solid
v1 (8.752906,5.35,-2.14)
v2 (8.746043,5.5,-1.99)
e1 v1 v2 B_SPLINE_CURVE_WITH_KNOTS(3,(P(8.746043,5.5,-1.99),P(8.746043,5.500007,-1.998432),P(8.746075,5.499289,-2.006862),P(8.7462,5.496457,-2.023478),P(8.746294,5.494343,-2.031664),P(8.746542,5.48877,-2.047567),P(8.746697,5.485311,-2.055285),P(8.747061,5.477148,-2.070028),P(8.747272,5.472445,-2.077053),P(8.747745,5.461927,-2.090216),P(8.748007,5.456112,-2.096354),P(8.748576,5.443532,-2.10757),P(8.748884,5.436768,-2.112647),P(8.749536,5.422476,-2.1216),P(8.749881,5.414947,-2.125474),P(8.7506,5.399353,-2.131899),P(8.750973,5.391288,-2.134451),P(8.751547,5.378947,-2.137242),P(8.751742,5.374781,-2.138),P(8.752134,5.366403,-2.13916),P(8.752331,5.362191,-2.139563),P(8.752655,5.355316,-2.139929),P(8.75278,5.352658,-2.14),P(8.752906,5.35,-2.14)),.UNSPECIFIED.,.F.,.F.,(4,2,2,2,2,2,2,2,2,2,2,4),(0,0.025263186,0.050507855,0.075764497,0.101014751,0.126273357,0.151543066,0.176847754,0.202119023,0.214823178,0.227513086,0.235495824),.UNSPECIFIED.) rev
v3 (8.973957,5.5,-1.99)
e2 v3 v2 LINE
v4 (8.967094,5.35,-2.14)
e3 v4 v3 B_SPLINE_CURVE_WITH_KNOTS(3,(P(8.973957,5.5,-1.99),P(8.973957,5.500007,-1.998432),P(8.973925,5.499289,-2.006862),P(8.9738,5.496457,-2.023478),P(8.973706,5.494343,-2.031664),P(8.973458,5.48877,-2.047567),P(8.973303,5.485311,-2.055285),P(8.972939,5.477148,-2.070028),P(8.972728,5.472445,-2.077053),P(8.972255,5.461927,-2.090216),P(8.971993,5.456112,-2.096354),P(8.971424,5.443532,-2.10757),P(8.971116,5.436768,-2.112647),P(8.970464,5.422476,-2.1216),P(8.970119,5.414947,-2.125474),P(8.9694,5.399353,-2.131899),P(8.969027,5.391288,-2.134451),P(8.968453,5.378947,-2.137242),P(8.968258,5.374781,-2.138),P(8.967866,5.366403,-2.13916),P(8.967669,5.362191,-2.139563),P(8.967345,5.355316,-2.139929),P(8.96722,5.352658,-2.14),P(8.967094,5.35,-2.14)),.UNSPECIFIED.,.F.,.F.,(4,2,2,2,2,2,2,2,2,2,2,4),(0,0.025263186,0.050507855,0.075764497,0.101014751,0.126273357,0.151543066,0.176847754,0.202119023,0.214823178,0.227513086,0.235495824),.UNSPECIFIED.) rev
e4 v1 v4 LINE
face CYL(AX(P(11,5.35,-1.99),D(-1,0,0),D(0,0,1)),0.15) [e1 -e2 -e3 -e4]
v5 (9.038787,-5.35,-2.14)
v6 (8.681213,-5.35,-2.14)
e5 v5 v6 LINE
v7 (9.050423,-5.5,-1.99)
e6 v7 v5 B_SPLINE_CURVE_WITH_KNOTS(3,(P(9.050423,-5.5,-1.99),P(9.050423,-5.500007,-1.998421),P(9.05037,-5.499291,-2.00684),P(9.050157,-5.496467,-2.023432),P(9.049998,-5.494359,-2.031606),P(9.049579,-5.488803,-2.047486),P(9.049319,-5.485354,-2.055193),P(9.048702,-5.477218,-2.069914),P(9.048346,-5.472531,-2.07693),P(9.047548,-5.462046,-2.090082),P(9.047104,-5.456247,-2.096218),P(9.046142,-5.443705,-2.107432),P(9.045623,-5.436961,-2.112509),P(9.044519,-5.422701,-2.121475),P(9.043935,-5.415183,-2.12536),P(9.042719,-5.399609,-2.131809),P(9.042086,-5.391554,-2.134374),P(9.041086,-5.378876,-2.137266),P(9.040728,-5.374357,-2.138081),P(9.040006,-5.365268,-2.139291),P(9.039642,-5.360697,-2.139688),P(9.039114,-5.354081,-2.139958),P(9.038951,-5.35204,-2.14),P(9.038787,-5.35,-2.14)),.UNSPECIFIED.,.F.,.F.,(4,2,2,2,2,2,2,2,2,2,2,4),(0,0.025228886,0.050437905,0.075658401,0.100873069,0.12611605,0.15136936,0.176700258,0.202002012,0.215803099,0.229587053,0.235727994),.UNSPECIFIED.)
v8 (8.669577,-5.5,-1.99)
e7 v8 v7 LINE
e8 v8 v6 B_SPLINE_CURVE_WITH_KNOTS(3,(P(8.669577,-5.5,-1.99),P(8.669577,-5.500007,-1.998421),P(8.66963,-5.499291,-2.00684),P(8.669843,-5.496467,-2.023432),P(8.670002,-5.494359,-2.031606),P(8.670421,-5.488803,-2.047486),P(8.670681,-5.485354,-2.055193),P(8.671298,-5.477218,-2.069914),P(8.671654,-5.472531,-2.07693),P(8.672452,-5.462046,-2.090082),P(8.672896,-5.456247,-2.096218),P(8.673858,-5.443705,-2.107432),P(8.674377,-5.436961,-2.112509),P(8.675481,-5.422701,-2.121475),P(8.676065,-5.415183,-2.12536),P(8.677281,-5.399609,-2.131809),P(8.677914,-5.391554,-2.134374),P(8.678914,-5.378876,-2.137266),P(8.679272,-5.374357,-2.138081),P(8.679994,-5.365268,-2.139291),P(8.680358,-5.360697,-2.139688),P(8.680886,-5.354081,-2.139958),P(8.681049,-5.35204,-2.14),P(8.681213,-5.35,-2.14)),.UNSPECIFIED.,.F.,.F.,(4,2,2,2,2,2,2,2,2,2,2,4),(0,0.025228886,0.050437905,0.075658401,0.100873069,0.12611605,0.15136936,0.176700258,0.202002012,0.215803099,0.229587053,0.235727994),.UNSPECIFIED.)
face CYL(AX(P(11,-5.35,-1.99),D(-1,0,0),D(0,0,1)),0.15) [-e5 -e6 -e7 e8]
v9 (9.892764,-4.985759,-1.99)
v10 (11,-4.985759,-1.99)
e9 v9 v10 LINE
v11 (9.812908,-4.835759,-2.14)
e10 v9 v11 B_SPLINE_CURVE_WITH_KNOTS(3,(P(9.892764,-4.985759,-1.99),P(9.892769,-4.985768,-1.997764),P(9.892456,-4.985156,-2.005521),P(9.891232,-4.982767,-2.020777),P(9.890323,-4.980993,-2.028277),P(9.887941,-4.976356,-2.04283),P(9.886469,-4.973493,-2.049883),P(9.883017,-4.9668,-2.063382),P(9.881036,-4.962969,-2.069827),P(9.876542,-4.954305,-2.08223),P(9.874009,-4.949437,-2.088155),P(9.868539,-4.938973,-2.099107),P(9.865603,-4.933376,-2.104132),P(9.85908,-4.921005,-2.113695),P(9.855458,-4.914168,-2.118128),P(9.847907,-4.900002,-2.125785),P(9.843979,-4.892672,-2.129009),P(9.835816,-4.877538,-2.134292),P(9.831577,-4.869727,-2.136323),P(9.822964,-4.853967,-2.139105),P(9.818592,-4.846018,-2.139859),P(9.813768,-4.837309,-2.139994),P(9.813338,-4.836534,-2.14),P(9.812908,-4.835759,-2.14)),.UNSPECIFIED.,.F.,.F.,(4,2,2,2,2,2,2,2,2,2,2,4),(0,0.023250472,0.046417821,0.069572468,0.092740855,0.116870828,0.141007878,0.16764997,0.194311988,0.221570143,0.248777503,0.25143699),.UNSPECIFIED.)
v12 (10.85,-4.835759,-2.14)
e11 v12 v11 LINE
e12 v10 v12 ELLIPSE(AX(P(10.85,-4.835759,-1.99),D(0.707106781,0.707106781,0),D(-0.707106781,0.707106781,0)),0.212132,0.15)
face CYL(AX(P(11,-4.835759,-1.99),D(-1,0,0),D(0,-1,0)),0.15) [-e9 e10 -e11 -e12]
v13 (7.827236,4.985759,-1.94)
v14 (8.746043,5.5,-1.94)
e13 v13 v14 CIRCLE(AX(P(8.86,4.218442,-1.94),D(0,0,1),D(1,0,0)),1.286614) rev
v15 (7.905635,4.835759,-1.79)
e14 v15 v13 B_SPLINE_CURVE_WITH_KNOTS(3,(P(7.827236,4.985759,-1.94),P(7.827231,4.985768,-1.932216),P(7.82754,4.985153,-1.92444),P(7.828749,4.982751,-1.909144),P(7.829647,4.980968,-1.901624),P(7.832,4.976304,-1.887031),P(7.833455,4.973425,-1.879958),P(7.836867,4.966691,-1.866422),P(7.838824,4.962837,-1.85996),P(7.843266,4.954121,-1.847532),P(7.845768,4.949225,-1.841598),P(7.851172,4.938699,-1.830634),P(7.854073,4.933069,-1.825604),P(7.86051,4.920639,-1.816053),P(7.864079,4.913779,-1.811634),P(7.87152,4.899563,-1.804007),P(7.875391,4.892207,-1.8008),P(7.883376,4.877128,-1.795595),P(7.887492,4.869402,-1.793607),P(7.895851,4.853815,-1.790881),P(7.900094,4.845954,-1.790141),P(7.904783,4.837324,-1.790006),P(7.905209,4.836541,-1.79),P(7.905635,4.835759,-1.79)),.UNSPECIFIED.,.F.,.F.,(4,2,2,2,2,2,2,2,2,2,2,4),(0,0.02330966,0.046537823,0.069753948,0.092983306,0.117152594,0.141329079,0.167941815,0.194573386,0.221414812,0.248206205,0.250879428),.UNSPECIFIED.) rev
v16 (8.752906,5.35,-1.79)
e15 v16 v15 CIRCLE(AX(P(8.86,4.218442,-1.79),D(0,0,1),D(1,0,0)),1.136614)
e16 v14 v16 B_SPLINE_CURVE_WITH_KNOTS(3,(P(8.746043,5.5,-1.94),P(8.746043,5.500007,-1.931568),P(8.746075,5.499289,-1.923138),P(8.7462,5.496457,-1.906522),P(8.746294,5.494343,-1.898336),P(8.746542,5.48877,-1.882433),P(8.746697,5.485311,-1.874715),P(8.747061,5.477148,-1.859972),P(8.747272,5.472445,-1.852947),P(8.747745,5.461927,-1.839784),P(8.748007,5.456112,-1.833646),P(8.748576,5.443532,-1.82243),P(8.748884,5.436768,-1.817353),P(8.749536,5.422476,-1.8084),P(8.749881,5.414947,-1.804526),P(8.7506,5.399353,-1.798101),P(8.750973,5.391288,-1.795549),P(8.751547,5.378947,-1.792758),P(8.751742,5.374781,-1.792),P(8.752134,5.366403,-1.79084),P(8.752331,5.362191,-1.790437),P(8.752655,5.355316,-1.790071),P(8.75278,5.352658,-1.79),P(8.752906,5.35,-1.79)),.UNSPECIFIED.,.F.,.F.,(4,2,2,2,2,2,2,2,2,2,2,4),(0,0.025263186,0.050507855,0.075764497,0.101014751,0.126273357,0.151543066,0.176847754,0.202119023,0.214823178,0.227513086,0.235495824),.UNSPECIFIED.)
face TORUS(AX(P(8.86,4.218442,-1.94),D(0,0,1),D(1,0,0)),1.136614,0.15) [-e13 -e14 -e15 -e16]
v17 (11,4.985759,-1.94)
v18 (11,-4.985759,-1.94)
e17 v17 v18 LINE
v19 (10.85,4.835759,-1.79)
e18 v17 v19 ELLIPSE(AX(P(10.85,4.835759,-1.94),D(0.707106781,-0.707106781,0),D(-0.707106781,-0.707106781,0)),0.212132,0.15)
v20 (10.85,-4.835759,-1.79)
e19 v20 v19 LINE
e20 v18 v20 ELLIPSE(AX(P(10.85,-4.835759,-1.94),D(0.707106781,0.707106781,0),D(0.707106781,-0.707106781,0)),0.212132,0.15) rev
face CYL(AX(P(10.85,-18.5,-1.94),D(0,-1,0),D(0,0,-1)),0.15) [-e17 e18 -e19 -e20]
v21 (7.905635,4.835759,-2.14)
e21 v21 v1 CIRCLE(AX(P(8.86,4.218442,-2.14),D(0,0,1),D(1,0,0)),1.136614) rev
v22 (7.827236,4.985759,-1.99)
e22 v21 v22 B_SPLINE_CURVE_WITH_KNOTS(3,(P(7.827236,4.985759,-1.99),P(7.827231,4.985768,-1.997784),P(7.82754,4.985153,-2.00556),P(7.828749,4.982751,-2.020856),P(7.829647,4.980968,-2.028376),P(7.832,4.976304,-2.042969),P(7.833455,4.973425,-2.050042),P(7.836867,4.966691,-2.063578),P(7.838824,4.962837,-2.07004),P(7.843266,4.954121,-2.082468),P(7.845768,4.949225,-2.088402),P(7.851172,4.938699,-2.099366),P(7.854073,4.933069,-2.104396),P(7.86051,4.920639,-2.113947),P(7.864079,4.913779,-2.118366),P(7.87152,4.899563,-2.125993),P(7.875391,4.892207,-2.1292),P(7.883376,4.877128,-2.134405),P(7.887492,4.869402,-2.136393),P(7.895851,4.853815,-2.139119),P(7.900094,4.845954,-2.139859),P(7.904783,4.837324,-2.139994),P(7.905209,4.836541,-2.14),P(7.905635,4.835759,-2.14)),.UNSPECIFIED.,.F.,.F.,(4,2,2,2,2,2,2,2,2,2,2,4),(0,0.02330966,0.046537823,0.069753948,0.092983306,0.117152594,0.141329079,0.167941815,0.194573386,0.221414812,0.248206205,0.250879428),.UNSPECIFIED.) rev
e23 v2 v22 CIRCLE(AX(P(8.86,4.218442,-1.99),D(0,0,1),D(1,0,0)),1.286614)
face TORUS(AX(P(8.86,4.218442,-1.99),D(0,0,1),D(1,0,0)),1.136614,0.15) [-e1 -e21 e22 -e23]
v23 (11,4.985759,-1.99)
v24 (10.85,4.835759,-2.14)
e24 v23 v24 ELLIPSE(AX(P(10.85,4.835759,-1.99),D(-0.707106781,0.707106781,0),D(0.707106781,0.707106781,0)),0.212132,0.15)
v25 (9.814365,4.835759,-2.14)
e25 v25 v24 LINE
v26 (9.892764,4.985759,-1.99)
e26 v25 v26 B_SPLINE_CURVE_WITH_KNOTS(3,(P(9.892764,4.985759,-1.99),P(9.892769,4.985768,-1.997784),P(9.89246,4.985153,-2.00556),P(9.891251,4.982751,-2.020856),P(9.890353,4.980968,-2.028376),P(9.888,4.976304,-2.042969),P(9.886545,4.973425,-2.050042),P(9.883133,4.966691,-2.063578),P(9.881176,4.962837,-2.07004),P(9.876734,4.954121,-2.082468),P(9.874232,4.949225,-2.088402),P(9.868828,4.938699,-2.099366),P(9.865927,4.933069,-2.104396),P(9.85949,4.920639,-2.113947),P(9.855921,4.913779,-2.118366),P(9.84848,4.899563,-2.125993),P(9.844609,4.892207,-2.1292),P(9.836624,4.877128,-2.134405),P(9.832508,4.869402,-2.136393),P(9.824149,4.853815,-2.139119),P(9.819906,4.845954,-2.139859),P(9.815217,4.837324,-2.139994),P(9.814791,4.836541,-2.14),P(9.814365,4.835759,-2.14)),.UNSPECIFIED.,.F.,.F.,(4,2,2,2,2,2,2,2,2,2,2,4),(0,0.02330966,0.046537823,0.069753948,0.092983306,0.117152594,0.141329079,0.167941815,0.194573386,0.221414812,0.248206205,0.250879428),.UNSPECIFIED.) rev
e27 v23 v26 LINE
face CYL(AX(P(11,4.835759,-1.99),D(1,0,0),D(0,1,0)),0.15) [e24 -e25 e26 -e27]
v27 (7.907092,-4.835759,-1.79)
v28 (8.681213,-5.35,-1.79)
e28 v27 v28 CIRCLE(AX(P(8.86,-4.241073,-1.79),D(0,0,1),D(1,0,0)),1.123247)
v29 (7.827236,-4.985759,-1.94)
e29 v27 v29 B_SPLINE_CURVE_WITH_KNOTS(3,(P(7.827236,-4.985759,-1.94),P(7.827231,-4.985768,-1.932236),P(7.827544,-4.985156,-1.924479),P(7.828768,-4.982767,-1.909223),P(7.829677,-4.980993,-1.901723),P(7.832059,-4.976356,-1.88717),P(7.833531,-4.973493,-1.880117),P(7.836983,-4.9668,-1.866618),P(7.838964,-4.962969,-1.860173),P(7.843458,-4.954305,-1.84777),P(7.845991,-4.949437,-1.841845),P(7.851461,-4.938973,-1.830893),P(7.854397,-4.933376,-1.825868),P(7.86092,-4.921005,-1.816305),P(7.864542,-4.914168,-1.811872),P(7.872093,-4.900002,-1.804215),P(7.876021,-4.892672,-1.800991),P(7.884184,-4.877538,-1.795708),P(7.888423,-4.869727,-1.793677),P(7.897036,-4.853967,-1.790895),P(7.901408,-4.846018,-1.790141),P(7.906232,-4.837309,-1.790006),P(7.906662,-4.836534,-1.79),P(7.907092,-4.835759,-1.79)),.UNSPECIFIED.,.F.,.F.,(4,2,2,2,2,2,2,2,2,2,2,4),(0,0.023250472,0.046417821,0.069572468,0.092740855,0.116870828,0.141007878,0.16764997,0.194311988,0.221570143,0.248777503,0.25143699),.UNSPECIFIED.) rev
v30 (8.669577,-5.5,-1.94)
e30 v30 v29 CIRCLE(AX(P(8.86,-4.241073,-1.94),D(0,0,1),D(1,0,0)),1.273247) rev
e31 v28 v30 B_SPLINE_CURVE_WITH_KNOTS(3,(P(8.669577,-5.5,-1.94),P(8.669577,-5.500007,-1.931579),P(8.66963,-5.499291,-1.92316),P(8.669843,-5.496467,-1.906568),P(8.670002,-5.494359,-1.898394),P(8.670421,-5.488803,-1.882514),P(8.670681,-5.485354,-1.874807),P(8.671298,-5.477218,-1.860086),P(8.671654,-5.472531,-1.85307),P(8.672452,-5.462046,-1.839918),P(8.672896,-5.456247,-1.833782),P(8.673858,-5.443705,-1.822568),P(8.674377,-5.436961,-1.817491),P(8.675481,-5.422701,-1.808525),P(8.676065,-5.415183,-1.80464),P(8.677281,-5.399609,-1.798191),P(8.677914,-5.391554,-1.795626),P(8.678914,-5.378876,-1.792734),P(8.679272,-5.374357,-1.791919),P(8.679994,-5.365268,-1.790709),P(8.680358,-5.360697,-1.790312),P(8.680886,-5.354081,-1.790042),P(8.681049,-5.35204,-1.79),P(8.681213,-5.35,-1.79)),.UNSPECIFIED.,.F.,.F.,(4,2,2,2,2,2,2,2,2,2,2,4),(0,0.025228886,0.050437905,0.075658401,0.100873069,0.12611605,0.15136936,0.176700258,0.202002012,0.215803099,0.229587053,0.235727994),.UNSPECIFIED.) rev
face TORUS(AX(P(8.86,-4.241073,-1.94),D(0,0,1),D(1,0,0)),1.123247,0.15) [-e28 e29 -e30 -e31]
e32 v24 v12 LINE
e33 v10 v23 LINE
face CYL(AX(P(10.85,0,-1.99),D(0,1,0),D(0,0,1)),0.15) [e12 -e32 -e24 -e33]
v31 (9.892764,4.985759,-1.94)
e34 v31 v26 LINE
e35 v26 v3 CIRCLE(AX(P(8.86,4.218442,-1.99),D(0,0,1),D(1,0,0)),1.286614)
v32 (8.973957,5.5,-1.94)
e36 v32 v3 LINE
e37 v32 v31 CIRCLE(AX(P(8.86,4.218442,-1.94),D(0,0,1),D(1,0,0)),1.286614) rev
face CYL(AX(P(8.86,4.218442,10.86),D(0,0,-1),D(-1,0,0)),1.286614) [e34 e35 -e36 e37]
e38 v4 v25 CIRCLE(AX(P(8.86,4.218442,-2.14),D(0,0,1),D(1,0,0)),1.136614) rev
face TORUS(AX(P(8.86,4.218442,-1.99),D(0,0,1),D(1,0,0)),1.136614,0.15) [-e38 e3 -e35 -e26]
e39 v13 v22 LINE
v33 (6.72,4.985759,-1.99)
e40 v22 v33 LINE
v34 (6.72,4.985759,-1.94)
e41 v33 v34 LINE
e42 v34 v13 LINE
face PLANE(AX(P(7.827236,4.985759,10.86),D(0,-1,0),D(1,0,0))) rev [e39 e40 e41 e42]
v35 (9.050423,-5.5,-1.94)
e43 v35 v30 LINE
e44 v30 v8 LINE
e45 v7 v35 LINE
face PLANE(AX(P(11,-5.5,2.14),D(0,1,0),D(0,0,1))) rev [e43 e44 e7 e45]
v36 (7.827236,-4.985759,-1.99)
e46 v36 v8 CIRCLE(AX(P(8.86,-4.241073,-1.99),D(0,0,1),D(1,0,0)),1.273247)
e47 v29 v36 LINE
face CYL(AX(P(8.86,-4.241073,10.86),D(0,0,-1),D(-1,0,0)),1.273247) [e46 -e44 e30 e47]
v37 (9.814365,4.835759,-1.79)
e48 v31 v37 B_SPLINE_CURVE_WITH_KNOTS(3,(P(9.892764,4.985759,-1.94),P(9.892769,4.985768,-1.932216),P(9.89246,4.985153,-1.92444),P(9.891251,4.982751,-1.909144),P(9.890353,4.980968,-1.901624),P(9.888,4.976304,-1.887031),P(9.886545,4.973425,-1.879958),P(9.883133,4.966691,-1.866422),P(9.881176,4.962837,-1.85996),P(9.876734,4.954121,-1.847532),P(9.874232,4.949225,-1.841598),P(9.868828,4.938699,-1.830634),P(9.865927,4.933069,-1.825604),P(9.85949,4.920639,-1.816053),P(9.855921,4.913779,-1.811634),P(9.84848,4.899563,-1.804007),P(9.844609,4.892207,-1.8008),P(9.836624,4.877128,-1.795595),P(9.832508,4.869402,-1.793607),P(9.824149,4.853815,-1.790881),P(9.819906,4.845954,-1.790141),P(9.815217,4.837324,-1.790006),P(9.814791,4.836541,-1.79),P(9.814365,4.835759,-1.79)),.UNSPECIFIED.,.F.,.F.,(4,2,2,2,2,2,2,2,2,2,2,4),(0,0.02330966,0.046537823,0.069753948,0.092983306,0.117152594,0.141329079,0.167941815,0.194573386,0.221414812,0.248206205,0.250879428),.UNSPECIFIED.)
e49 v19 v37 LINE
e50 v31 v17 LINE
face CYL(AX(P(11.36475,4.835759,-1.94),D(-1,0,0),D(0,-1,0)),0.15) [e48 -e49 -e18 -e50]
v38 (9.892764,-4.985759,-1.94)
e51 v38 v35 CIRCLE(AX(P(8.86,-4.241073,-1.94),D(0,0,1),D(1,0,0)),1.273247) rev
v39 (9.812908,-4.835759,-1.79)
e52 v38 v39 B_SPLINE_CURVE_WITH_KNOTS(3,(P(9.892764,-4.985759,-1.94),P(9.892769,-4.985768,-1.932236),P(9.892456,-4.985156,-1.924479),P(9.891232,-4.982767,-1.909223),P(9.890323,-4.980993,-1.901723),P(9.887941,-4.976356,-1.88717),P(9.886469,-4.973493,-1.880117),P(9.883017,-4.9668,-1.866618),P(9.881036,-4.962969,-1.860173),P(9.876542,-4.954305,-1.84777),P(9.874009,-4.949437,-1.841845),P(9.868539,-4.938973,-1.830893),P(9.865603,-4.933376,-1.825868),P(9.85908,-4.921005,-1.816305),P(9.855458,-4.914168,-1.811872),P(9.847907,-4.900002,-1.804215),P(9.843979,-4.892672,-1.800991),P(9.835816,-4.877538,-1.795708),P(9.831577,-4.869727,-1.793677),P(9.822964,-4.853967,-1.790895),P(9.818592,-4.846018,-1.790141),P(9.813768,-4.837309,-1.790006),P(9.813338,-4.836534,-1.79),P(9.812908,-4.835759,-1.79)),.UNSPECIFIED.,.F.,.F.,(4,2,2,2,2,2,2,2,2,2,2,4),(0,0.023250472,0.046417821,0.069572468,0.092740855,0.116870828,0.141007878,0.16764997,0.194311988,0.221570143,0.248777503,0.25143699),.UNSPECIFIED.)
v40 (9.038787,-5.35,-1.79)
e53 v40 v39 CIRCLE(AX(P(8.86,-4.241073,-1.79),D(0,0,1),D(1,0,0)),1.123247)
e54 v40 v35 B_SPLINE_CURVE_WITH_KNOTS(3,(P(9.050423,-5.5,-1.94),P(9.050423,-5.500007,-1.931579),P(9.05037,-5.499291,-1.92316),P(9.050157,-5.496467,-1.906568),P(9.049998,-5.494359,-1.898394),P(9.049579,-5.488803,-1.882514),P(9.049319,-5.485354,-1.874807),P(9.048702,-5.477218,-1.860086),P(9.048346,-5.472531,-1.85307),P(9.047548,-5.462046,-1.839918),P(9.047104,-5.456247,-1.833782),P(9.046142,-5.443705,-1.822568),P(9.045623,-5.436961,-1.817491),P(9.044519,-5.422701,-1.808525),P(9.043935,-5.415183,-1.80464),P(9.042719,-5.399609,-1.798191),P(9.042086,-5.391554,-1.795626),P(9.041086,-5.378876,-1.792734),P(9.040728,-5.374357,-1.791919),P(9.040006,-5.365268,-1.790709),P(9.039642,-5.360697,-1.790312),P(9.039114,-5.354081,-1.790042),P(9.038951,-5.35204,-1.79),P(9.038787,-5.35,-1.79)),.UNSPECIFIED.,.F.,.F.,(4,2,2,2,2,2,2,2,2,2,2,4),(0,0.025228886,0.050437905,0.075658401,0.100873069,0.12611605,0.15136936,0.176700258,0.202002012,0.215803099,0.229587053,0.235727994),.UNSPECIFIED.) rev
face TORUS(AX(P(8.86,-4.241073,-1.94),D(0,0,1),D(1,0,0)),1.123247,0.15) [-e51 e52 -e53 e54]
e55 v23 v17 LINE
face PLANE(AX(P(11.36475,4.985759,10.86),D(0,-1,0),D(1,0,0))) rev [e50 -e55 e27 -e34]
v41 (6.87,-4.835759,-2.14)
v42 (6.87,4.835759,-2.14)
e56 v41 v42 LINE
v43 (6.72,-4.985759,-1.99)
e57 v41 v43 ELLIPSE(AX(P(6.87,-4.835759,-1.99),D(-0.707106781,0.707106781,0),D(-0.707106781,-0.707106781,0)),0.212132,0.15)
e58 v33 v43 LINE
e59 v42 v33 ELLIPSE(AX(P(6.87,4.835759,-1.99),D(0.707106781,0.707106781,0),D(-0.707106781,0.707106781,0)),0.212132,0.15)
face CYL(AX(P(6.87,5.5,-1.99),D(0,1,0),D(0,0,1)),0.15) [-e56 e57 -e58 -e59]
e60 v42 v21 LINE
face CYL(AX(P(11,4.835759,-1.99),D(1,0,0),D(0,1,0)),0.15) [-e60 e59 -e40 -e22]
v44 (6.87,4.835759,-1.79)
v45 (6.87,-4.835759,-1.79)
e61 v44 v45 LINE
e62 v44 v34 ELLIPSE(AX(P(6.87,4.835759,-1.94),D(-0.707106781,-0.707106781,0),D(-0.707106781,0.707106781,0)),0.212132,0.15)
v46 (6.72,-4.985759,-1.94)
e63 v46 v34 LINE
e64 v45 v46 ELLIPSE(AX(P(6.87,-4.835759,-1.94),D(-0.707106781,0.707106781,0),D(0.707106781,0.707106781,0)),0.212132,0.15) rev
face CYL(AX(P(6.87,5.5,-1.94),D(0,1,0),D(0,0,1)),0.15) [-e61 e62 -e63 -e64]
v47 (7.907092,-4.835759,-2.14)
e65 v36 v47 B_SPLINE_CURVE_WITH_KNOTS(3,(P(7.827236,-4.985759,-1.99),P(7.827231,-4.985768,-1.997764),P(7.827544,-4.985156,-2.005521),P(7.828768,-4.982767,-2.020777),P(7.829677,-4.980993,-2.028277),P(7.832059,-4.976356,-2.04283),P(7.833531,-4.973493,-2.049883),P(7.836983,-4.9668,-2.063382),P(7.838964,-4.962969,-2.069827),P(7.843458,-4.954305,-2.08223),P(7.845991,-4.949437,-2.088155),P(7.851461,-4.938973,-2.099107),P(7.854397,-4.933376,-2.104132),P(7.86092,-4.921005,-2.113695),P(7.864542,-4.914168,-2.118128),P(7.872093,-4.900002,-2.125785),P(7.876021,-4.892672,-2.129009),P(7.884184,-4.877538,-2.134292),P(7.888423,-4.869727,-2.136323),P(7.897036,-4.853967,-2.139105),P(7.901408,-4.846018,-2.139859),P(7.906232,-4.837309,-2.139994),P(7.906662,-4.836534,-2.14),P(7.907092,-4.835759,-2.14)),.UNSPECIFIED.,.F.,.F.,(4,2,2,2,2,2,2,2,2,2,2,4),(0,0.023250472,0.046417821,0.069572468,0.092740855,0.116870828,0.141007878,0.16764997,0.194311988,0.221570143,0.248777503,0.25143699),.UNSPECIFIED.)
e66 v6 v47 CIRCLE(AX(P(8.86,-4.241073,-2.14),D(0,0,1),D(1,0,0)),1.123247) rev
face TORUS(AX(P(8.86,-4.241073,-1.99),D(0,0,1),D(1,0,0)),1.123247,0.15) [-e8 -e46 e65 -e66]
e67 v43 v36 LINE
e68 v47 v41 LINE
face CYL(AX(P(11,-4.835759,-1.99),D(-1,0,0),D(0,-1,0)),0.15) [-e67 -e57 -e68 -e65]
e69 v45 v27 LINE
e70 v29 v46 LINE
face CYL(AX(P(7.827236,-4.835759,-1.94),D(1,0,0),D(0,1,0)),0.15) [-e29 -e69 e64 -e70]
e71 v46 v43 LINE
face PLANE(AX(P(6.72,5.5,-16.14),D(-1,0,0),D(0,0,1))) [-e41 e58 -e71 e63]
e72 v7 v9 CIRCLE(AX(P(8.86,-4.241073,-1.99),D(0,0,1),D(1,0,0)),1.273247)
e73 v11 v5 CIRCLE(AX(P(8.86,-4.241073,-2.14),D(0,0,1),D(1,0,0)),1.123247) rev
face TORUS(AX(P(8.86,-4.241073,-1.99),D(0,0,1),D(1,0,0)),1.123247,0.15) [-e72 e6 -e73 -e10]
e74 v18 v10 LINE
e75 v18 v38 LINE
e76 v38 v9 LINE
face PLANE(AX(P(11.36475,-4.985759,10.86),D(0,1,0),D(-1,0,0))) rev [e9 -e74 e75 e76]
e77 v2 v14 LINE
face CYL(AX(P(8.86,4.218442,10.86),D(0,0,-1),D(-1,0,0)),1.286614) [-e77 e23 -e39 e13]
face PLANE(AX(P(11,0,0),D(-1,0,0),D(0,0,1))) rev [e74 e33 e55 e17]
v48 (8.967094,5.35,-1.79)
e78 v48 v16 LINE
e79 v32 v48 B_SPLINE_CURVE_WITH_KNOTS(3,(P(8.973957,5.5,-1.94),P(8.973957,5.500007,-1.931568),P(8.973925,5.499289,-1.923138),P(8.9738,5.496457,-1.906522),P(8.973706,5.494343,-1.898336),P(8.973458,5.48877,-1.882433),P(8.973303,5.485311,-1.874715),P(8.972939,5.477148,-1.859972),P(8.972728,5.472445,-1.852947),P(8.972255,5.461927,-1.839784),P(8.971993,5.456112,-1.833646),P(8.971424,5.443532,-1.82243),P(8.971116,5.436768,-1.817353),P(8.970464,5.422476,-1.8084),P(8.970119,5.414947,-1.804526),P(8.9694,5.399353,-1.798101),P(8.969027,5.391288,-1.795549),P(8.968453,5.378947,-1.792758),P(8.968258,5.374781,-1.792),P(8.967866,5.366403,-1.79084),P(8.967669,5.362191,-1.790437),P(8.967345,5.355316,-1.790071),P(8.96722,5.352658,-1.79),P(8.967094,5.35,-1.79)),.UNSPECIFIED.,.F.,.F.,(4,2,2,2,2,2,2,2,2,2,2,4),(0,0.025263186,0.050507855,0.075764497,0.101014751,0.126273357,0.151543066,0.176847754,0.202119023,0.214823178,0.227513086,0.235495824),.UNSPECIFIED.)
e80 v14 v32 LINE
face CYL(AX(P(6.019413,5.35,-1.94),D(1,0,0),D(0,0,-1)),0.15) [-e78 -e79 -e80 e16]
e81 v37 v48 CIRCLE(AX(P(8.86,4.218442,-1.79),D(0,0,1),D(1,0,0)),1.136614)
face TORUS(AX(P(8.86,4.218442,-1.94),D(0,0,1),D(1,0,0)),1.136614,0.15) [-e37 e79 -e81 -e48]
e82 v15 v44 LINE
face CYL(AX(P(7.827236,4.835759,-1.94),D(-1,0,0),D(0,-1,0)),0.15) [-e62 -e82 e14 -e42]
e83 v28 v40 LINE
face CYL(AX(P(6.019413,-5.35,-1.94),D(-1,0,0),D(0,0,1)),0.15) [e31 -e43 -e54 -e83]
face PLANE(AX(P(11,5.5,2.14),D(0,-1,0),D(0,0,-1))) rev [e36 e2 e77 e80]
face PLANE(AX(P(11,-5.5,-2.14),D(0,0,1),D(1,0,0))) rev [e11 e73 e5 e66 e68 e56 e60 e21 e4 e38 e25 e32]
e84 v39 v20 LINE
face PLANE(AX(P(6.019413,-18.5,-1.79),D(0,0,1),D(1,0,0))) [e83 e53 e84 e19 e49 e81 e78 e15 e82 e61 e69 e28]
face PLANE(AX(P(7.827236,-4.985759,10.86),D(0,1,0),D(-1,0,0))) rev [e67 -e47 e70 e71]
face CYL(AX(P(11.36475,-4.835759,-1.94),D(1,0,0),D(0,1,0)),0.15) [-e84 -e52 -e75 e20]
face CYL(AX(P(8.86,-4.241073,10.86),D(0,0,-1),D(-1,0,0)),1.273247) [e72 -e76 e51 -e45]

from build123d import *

# Parameters (mm, degrees)
ESBO_O1_W                  = 4.28
ESBO_O1_H                  = 11
RESSALTO_EXTRUS_O1_DEPTH   = 11
CORTE_EXTRUS_O1_DEPTH      = 14
CORTE_EXTRUS_O1_DEPTH_BACK = 8.18
CORTE_EXTRUS_O3_DEPTH      = 13
CORTE_EXTRUS_O3_DEPTH_BACK = 12.18
CORTE_EXTRUS_O5_DEPTH      = 7.18
CORTE_EXTRUS_O5_DEPTH_BACK = 13
FILETE2_R                  = 0.15


with BuildPart() as part:
    # Esboço1 → Ressalto-extrusão1 (new body)
    with BuildSketch(Plane(origin=(0, 0, 0), x_dir=(0, 0, -1), z_dir=(1, 0, 0))):
        Rectangle(ESBO_O1_W, ESBO_O1_H)
    extrude(amount=RESSALTO_EXTRUS_O1_DEPTH)

    # Esboço4 → Corte-extrusão1 (cut, two sides: drawn at the far end of the back side and taken through both)
    with BuildSketch(Plane(origin=(0, 0, -2.14), x_dir=(-1, 0, 0), z_dir=(0, 0, -1)).offset(-CORTE_EXTRUS_O1_DEPTH_BACK)):
        Polygon((-6.72, 5.5), (-6.72, -5.5), (-6.72, -6.924664603), (2.265516733, -6.924664603), (2.265516733, 6.311337166), (-6.479345422, 6.786171311), align=None)
    extrude(amount=CORTE_EXTRUS_O1_DEPTH + CORTE_EXTRUS_O1_DEPTH_BACK, mode=Mode.SUBTRACT)

    # Esboço5 → Corte-extrusão3 (cut, two sides: drawn at the far end of the back side and taken through both)
    with BuildSketch(Plane.XZ.offset(5.5).offset(-CORTE_EXTRUS_O3_DEPTH_BACK)):
        Polygon((6.019412649, -1.79), (11.617448209, -1.79), (11.996193189, 3.076148253), (6.185690933, 3.076148253), (6.019412649, -1.376414684), (6.019412649, -1.487266873), align=None)
    extrude(amount=CORTE_EXTRUS_O3_DEPTH + CORTE_EXTRUS_O3_DEPTH_BACK, mode=Mode.SUBTRACT)

    # Esboço6 → Corte-extrusão5 (cut, two sides: drawn at the far end of the back side and taken through both)
    with BuildSketch(Plane(origin=(0, 0, -2.14), x_dir=(-1, 0, 0), z_dir=(0, 0, -1)).offset(-CORTE_EXTRUS_O5_DEPTH_BACK)):
        with BuildLine():
            Line((-7.827235736, 4.985758514), (-6.355249889, 4.985758514))
            Line((-6.355249889, 4.985758514), (-5.940072912, 7.451017437))
            Line((-5.940072912, 7.451017437), (-11.125738277, 7.451017437))
            Line((-11.125738277, 7.451017437), (-11.364750111, 4.985758514))
            Line((-11.364750111, 4.985758514), (-9.892764264, 4.985758514))
            ThreePointArc((-9.892764264, 4.985758514), (-8.86, 5.50505659), (-7.827235736, 4.985758514))
        make_face()
        with BuildLine():
            Line((-7.827235736, -4.985758514), (-6.355249889, -4.985758514))
            Line((-6.355249889, -4.985758514), (-6.545759622, -6.950748332))
            Line((-6.545759622, -6.950748332), (-10.182890029, -6.950748332))
            Line((-10.182890029, -6.950748332), (-13.175715932, -6.660587814))
            Line((-13.175715932, -6.660587814), (-11.364750111, -4.985758514))
            Line((-11.364750111, -4.985758514), (-9.892764264, -4.985758514))
            ThreePointArc((-9.892764264, -4.985758514), (-8.86, -5.514320063), (-7.827235736, -4.985758514))
        make_face()
    extrude(amount=CORTE_EXTRUS_O5_DEPTH + CORTE_EXTRUS_O5_DEPTH_BACK, mode=Mode.SUBTRACT)

    # Filete2
    # the kernel refuses this fillet: 0.15 mm, written as the material it takes off along each edge
    with BuildSketch(Plane(origin=(9.34895697, 5.5, -1.79), x_dir=(0, -1, 0), z_dir=(-1, 0, 0)), Plane(origin=(8.37104303, 5.5, -2.14), x_dir=(0, -1, 0), z_dir=(1, 0, 0))) as filete2_piece_1:
        with BuildLine():
            CenterArc((FILETE2_R, -FILETE2_R), FILETE2_R, 90, 90)
            Line((0, -FILETE2_R), (0, 0))
            Line((0, 0), (FILETE2_R, 0))
        make_face()
    extrude(amount=0.977913941, mode=Mode.SUBTRACT)
    with BuildSketch(Plane(origin=(11.375, 4.985758514, -1.79), x_dir=(0, -1, 0), z_dir=(-1, 0, 0))) as filete2_piece_2_section:
        with BuildLine():
            CenterArc((FILETE2_R, -FILETE2_R), FILETE2_R, 90, 90)
            Line((0, -FILETE2_R), (0, 0))
            Line((0, 0), (FILETE2_R, 0))
        make_face()
    filete2_piece_2 = extrude(amount=1.857235736, mode=Mode.PRIVATE)
    filete2_piece_2 = filete2_piece_2 - Plane(origin=(8.86, 4.21844243, -1.824247576), x_dir=(0.8026992826896523, 0.5963839883577674, 0), z_dir=(0, 0, 1)) * Cylinder(1.28661416, 5, mode=Mode.PRIVATE)
    add(filete2_piece_2, mode=Mode.SUBTRACT)
    with BuildSketch(Plane(origin=(8.86, 4.21844243, -1.79), x_dir=(0.940229636725142, 0.34054108448718423, 0), z_dir=(0.34054108448718423, -0.940229636725142, 0))) as filete2_piece_3_section:
        with BuildLine():
            CenterArc((1.28661416 - FILETE2_R, -FILETE2_R), FILETE2_R, 0, 90)
            Line((1.28661416, -FILETE2_R), (1.28661416, 0))
            Line((1.28661416, 0), (1.28661416 - FILETE2_R, 0))
        make_face()
    filete2_piece_3 = revolve(axis=Axis((8.86, 4.21844243, -1.79), (0, 0, 1)), revolution_arc=81.710254876, mode=Mode.PRIVATE)
    filete2_piece_3 = split(filete2_piece_3, bisect_by=Plane(origin=(9.30349686, 4.985758514, -1.832519321), z_dir=(0, 1, 0)), keep=Keep.TOP, mode=Mode.PRIVATE)
    add(filete2_piece_3, mode=Mode.SUBTRACT)
    with BuildSketch(Plane(origin=(8.86, 4.21844243, -1.79), x_dir=(0.20142152320806478, 0.9795046554195355, 0), z_dir=(0.9795046554195355, -0.20142152320806478, 0))) as filete2_piece_4_section:
        with BuildLine():
            CenterArc((1.28661416 - FILETE2_R, -FILETE2_R), FILETE2_R, 0, 90)
            Line((1.28661416, -FILETE2_R), (1.28661416, 0))
            Line((1.28661416, 0), (1.28661416 - FILETE2_R, 0))
        make_face()
    filete2_piece_4 = revolve(axis=Axis((8.86, 4.21844243, -1.79), (0, 0, 1)), revolution_arc=81.710254876, mode=Mode.PRIVATE)
    filete2_piece_4 = split(filete2_piece_4, bisect_by=Plane(origin=(8.416503141, 4.985758514, -1.832519323), z_dir=(0, 1, 0)), keep=Keep.TOP, mode=Mode.PRIVATE)
    add(filete2_piece_4, mode=Mode.SUBTRACT)
    with BuildSketch(Plane(origin=(8.202235736, 4.985758514, -1.79), x_dir=(0, -1, 0), z_dir=(-1, 0, 0))) as filete2_piece_5_section:
        with BuildLine():
            CenterArc((FILETE2_R, -FILETE2_R), FILETE2_R, 90, 90)
            Line((0, -FILETE2_R), (0, 0))
            Line((0, 0), (FILETE2_R, 0))
        make_face()
    filete2_piece_5 = extrude(amount=1.857235736, mode=Mode.PRIVATE)
    filete2_piece_5 = filete2_piece_5 - Plane(origin=(8.86, 4.21844243, -1.824247576), x_dir=(0.8026992826896523, 0.5963839883577674, 0), z_dir=(0, 0, 1)) * Cylinder(1.28661416, 5, mode=Mode.PRIVATE)
    add(filete2_piece_5, mode=Mode.SUBTRACT)
    with BuildSketch(Plane(origin=(6.72, 5.360758514, -2.14), x_dir=(1, 0, 0), z_dir=(0, -1, 0)), Plane(origin=(6.72, -5.360758514, -1.79), x_dir=(1, 0, 0), z_dir=(0, 1, 0)), Plane(origin=(11, 5.360758514, -1.79), x_dir=(-1, 0, 0), z_dir=(0, -1, 0)), Plane(origin=(11, -5.360758514, -2.14), x_dir=(-1, 0, 0), z_dir=(0, 1, 0))) as filete2_piece_6:
        with BuildLine():
            CenterArc((FILETE2_R, FILETE2_R), FILETE2_R, 180, 90)
            Line((0, FILETE2_R), (0, 0))
            Line((0, 0), (FILETE2_R, 0))
        make_face()
    extrude(amount=10.721517028, mode=Mode.SUBTRACT)
    with BuildSketch(Plane(origin=(8.202235736, 4.985758514, -2.14), x_dir=(0, -1, 0), z_dir=(-1, 0, 0))) as filete2_piece_7_section:
        with BuildLine():
            CenterArc((FILETE2_R, FILETE2_R), FILETE2_R, 180, 90)
            Line((0, FILETE2_R), (0, 0))
            Line((0, 0), (FILETE2_R, 0))
        make_face()
    filete2_piece_7 = extrude(amount=1.857235736, mode=Mode.PRIVATE)
    filete2_piece_7 = filete2_piece_7 - Plane(origin=(8.86, 4.21844243, -2.105752424), x_dir=(0.8026992826896523, 0.5963839883577674, 0), z_dir=(0, 0, 1)) * Cylinder(1.28661416, 5, mode=Mode.PRIVATE)
    add(filete2_piece_7, mode=Mode.SUBTRACT)
    with BuildSketch(Plane(origin=(8.86, 4.21844243, -2.14), x_dir=(0.20142152320806478, 0.9795046554195355, 0), z_dir=(0.9795046554195355, -0.20142152320806478, 0))) as filete2_piece_8_section:
        with BuildLine():
            CenterArc((1.28661416 - FILETE2_R, FILETE2_R), FILETE2_R, 270, 90)
            Line((1.28661416, FILETE2_R), (1.28661416, 0))
            Line((1.28661416, 0), (1.28661416 - FILETE2_R, 0))
        make_face()
    filete2_piece_8 = revolve(axis=Axis((8.86, 4.21844243, -2.14), (0, 0, 1)), revolution_arc=81.710254876, mode=Mode.PRIVATE)
    filete2_piece_8 = split(filete2_piece_8, bisect_by=Plane(origin=(8.416503141, 4.985758514, -2.097480677), z_dir=(0, 1, 0)), keep=Keep.TOP, mode=Mode.PRIVATE)
    add(filete2_piece_8, mode=Mode.SUBTRACT)
    with BuildSketch(Plane(origin=(8.86, 4.21844243, -2.14), x_dir=(0.940229636725142, 0.34054108448718423, 0), z_dir=(0.34054108448718423, -0.940229636725142, 0))) as filete2_piece_9_section:
        with BuildLine():
            CenterArc((1.28661416 - FILETE2_R, FILETE2_R), FILETE2_R, 270, 90)
            Line((1.28661416, FILETE2_R), (1.28661416, 0))
            Line((1.28661416, 0), (1.28661416 - FILETE2_R, 0))
        make_face()
    filete2_piece_9 = revolve(axis=Axis((8.86, 4.21844243, -2.14), (0, 0, 1)), revolution_arc=81.710254876, mode=Mode.PRIVATE)
    filete2_piece_9 = split(filete2_piece_9, bisect_by=Plane(origin=(9.30349686, 4.985758514, -2.097480679), z_dir=(0, 1, 0)), keep=Keep.TOP, mode=Mode.PRIVATE)
    add(filete2_piece_9, mode=Mode.SUBTRACT)
    with BuildSketch(Plane(origin=(11.375, 4.985758514, -2.14), x_dir=(0, -1, 0), z_dir=(-1, 0, 0))) as filete2_piece_10_section:
        with BuildLine():
            CenterArc((FILETE2_R, FILETE2_R), FILETE2_R, 180, 90)
            Line((0, FILETE2_R), (0, 0))
            Line((0, 0), (FILETE2_R, 0))
        make_face()
    filete2_piece_10 = extrude(amount=1.857235736, mode=Mode.PRIVATE)
    filete2_piece_10 = filete2_piece_10 - Plane(origin=(8.86, 4.21844243, -2.105752424), x_dir=(0.8026992826896523, 0.5963839883577674, 0), z_dir=(0, 0, 1)) * Cylinder(1.28661416, 5, mode=Mode.PRIVATE)
    add(filete2_piece_10, mode=Mode.SUBTRACT)
    with BuildSketch(Plane(origin=(8.294577036, -5.5, -1.79), x_dir=(0, 0, -1), z_dir=(1, 0, 0))) as filete2_piece_11:
        with BuildLine():
            CenterArc((FILETE2_R, FILETE2_R), FILETE2_R, 180, 90)
            Line((0, FILETE2_R), (0, 0))
            Line((0, 0), (FILETE2_R, 0))
        make_face()
    extrude(amount=1.130845928, mode=Mode.SUBTRACT)
    with BuildSketch(Plane(origin=(8.202235736, -4.985758514, -1.79), x_dir=(0, 1, 0), z_dir=(-1, 0, 0))) as filete2_piece_12_section:
        with BuildLine():
            CenterArc((FILETE2_R, FILETE2_R), FILETE2_R, 180, 90)
            Line((0, FILETE2_R), (0, 0))
            Line((0, 0), (FILETE2_R, 0))
        make_face()
    filete2_piece_12 = extrude(amount=1.857235736, mode=Mode.PRIVATE)
    filete2_piece_12 = filete2_piece_12 - Plane(origin=(8.86, -4.24107257, -1.824238656), x_dir=(0.8111260921200049, -0.5848713214734753, 0), z_dir=(0, 0, 1)) * Cylinder(1.273247493, 5, mode=Mode.PRIVATE)
    add(filete2_piece_12, mode=Mode.SUBTRACT)
    with BuildSketch(Plane(origin=(8.86, -4.24107257, -1.79), x_dir=(-0.9459877087145345, -0.324202490676776, 0), z_dir=(-0.324202490676776, 0.9459877087145345, 0))) as filete2_piece_13_section:
        with BuildLine():
            CenterArc((1.273247493 - FILETE2_R, -FILETE2_R), FILETE2_R, 0, 90)
            Line((1.273247493, -FILETE2_R), (1.273247493, 0))
            Line((1.273247493, 0), (1.273247493 - FILETE2_R, 0))
        make_face()
    filete2_piece_13 = revolve(axis=Axis((8.86, -4.24107257, -1.79), (0, 0, 1)), revolution_arc=79.358119844, mode=Mode.PRIVATE)
    filete2_piece_13 = split(filete2_piece_13, bisect_by=Plane(origin=(8.379810513, -4.985758514, -1.832543049), z_dir=(0, -1, 0)), keep=Keep.TOP, mode=Mode.PRIVATE)
    add(filete2_piece_13, mode=Mode.SUBTRACT)
    with BuildSketch(Plane(origin=(8.86, -4.24107257, -1.79), x_dir=(-0.14393107441873307, -0.9895877150695988, 0), z_dir=(-0.9895877150695988, 0.14393107441873307, 0))) as filete2_piece_14_section:
        with BuildLine():
            CenterArc((1.273247493 - FILETE2_R, -FILETE2_R), FILETE2_R, 0, 90)
            Line((1.273247493 - FILETE2_R, 0), (1.273247493, 0))
            Line((1.273247493, 0), (1.273247493, -FILETE2_R))
        make_face()
    filete2_piece_14 = revolve(axis=Axis((8.86, -4.24107257, -1.79), (0, 0, 1)), revolution_arc=79.358119844, mode=Mode.PRIVATE)
    filete2_piece_14 = split(filete2_piece_14, bisect_by=Plane(origin=(9.340189487, -4.985758514, -1.83254305), z_dir=(0, -1, 0)), keep=Keep.TOP, mode=Mode.PRIVATE)
    add(filete2_piece_14, mode=Mode.SUBTRACT)
    with BuildSketch(Plane(origin=(11.375, -4.985758514, -1.79), x_dir=(0, 1, 0), z_dir=(-1, 0, 0))) as filete2_piece_15_section:
        with BuildLine():
            CenterArc((FILETE2_R, FILETE2_R), FILETE2_R, 180, 90)
            Line((0, FILETE2_R), (0, 0))
            Line((0, 0), (FILETE2_R, 0))
        make_face()
    filete2_piece_15 = extrude(amount=1.857235736, mode=Mode.PRIVATE)
    filete2_piece_15 = filete2_piece_15 - Plane(origin=(8.86, -4.24107257, -1.824238656), x_dir=(0.8111260921200049, -0.5848713214734753, 0), z_dir=(0, 0, 1)) * Cylinder(1.273247493, 5, mode=Mode.PRIVATE)
    add(filete2_piece_15, mode=Mode.SUBTRACT)
    with BuildSketch(Plane(origin=(8.294577036, -5.5, -2.14), x_dir=(0, 0, 1), z_dir=(1, 0, 0))) as filete2_piece_16:
        with BuildLine():
            CenterArc((FILETE2_R, -FILETE2_R), FILETE2_R, 90, 90)
            Line((0, -FILETE2_R), (0, 0))
            Line((0, 0), (FILETE2_R, 0))
        make_face()
    extrude(amount=1.130845928, mode=Mode.SUBTRACT)
    with BuildSketch(Plane(origin=(11.375, -4.985758514, -2.14), x_dir=(0, 1, 0), z_dir=(-1, 0, 0))) as filete2_piece_17_section:
        with BuildLine():
            CenterArc((FILETE2_R, -FILETE2_R), FILETE2_R, 90, 90)
            Line((0, -FILETE2_R), (0, 0))
            Line((0, 0), (FILETE2_R, 0))
        make_face()
    filete2_piece_17 = extrude(amount=1.857235736, mode=Mode.PRIVATE)
    filete2_piece_17 = filete2_piece_17 - Plane(origin=(8.86, -4.24107257, -2.105761344), x_dir=(0.8111260921200049, -0.5848713214734753, 0), z_dir=(0, 0, 1)) * Cylinder(1.273247493, 5, mode=Mode.PRIVATE)
    add(filete2_piece_17, mode=Mode.SUBTRACT)
    with BuildSketch(Plane(origin=(8.86, -4.24107257, -2.14), x_dir=(-0.14393107441877348, -0.9895877150695928, 0), z_dir=(-0.9895877150695928, 0.14393107441877348, 0))) as filete2_piece_18_section:
        with BuildLine():
            CenterArc((1.273247493 - FILETE2_R, FILETE2_R), FILETE2_R, 270, 90)
            Line((1.273247493, FILETE2_R), (1.273247493, 0))
            Line((1.273247493, 0), (1.273247493 - FILETE2_R, 0))
        make_face()
    filete2_piece_18 = revolve(axis=Axis((8.86, -4.24107257, -2.14), (0, 0, 1)), revolution_arc=79.358119844, mode=Mode.PRIVATE)
    filete2_piece_18 = split(filete2_piece_18, bisect_by=Plane(origin=(9.340189487, -4.985758514, -2.09745695), z_dir=(0, -1, 0)), keep=Keep.TOP, mode=Mode.PRIVATE)
    add(filete2_piece_18, mode=Mode.SUBTRACT)
    with BuildSketch(Plane(origin=(8.86, -4.24107257, -2.14), x_dir=(-0.9459877087145341, -0.3242024906767768, 0), z_dir=(-0.3242024906767768, 0.9459877087145341, 0))) as filete2_piece_19_section:
        with BuildLine():
            CenterArc((1.273247493 - FILETE2_R, FILETE2_R), FILETE2_R, 270, 90)
            Line((1.273247493, FILETE2_R), (1.273247493, 0))
            Line((1.273247493, 0), (1.273247493 - FILETE2_R, 0))
        make_face()
    filete2_piece_19 = revolve(axis=Axis((8.86, -4.24107257, -2.14), (0, 0, 1)), revolution_arc=79.358119844, mode=Mode.PRIVATE)
    filete2_piece_19 = split(filete2_piece_19, bisect_by=Plane(origin=(8.379810513, -4.985758514, -2.097456951), z_dir=(0, -1, 0)), keep=Keep.TOP, mode=Mode.PRIVATE)
    add(filete2_piece_19, mode=Mode.SUBTRACT)
    with BuildSketch(Plane(origin=(8.202235736, -4.985758514, -2.14), x_dir=(0, 1, 0), z_dir=(-1, 0, 0))) as filete2_piece_20_section:
        with BuildLine():
            CenterArc((FILETE2_R, -FILETE2_R), FILETE2_R, 90, 90)
            Line((0, -FILETE2_R), (0, 0))
            Line((0, 0), (FILETE2_R, 0))
        make_face()
    filete2_piece_20 = extrude(amount=1.857235736, mode=Mode.PRIVATE)
    filete2_piece_20 = filete2_piece_20 - Plane(origin=(8.86, -4.24107257, -2.105761344), x_dir=(0.8111260921200049, -0.5848713214734753, 0), z_dir=(0, 0, 1)) * Cylinder(1.273247493, 5, mode=Mode.PRIVATE)
    add(filete2_piece_20, mode=Mode.SUBTRACT)
    with BuildSketch(Plane(origin=(8.86, 4.21844243, -1.79), x_dir=(0.940229636725142, 0.34054108448718423, 0), z_dir=(0.34054108448718423, -0.940229636725142, 0))) as filete2_piece_21a_section:
        with BuildLine():
            CenterArc((1.28661416 - FILETE2_R, -FILETE2_R), FILETE2_R, 0, 90)
            Line((1.28661416, -FILETE2_R), (1.28661416, 0))
            Line((1.28661416, 0), (1.28661416 - FILETE2_R, 0))
        make_face()
    filete2_piece_21a = revolve(axis=Axis((8.86, 4.21844243, -1.79), (0, 0, 1)), revolution_arc=81.710254876, mode=Mode.PRIVATE)
    filete2_piece_21a = split(filete2_piece_21a, bisect_by=Plane(origin=(9.951335845, 4.985758514, -1.823219459), z_dir=(0, -1, 0)), keep=Keep.TOP, mode=Mode.PRIVATE)
    with BuildSketch(Plane(origin=(11.375, 4.985758514, -1.79), x_dir=(0, -1, 0), z_dir=(-1, 0, 0))) as filete2_piece_21b_section:
        with BuildLine():
            CenterArc((FILETE2_R, -FILETE2_R), FILETE2_R, 90, 90)
            Line((0, -FILETE2_R), (0, 0))
            Line((0, 0), (FILETE2_R, 0))
        make_face()
    filete2_piece_21b = extrude(amount=1.857235736, mode=Mode.PRIVATE)
    filete2_piece_21b = filete2_piece_21b & Plane(origin=(8.86, 4.21844243, -1.822904463), x_dir=(0.8026992826896523, 0.5963839883577674, 0), z_dir=(0, 0, 1)) * Cylinder(1.28661416, 5, mode=Mode.PRIVATE)
    filete2_piece_21 = filete2_piece_21a & filete2_piece_21b
    add(filete2_piece_21, mode=Mode.SUBTRACT)
    with BuildSketch(Plane(origin=(8.202235736, 4.985758514, -1.79), x_dir=(0, -1, 0), z_dir=(-1, 0, 0))) as filete2_piece_22a_section:
        with BuildLine():
            CenterArc((FILETE2_R, -FILETE2_R), FILETE2_R, 90, 90)
            Line((0, -FILETE2_R), (0, 0))
            Line((0, 0), (FILETE2_R, 0))
        make_face()
    filete2_piece_22a = extrude(amount=1.857235736, mode=Mode.PRIVATE)
    filete2_piece_22a = filete2_piece_22a & Plane(origin=(8.86, 4.21844243, -1.822904463), x_dir=(0.8026992826896523, 0.5963839883577674, 0), z_dir=(0, 0, 1)) * Cylinder(1.28661416, 5, mode=Mode.PRIVATE)
    with BuildSketch(Plane(origin=(8.86, 4.21844243, -1.79), x_dir=(0.20142152320806478, 0.9795046554195355, 0), z_dir=(0.9795046554195355, -0.20142152320806478, 0))) as filete2_piece_22b_section:
        with BuildLine():
            CenterArc((1.28661416 - FILETE2_R, -FILETE2_R), FILETE2_R, 0, 90)
            Line((1.28661416, -FILETE2_R), (1.28661416, 0))
            Line((1.28661416, 0), (1.28661416 - FILETE2_R, 0))
        make_face()
    filete2_piece_22b = revolve(axis=Axis((8.86, 4.21844243, -1.79), (0, 0, 1)), revolution_arc=81.710254876, mode=Mode.PRIVATE)
    filete2_piece_22b = split(filete2_piece_22b, bisect_by=Plane(origin=(7.768663503, 4.985758514, -1.823219564), z_dir=(0, -1, 0)), keep=Keep.TOP, mode=Mode.PRIVATE)
    filete2_piece_22 = filete2_piece_22a & filete2_piece_22b
    add(filete2_piece_22, mode=Mode.SUBTRACT)
    with BuildSketch(Plane(origin=(8.202235736, 4.985758514, -2.14), x_dir=(0, -1, 0), z_dir=(-1, 0, 0))) as filete2_piece_23a_section:
        with BuildLine():
            CenterArc((FILETE2_R, FILETE2_R), FILETE2_R, 180, 90)
            Line((0, FILETE2_R), (0, 0))
            Line((0, 0), (FILETE2_R, 0))
        make_face()
    filete2_piece_23a = extrude(amount=1.857235736, mode=Mode.PRIVATE)
    filete2_piece_23a = filete2_piece_23a & Plane(origin=(8.86, 4.21844243, -2.107095537), x_dir=(0.8026992826896523, 0.5963839883577674, 0), z_dir=(0, 0, 1)) * Cylinder(1.28661416, 5, mode=Mode.PRIVATE)
    with BuildSketch(Plane(origin=(8.86, 4.21844243, -2.14), x_dir=(0.20142152320806478, 0.9795046554195355, 0), z_dir=(0.9795046554195355, -0.20142152320806478, 0))) as filete2_piece_23b_section:
        with BuildLine():
            CenterArc((1.28661416 - FILETE2_R, FILETE2_R), FILETE2_R, 270, 90)
            Line((1.28661416, FILETE2_R), (1.28661416, 0))
            Line((1.28661416, 0), (1.28661416 - FILETE2_R, 0))
        make_face()
    filete2_piece_23b = revolve(axis=Axis((8.86, 4.21844243, -2.14), (0, 0, 1)), revolution_arc=81.710254876, mode=Mode.PRIVATE)
    filete2_piece_23b = split(filete2_piece_23b, bisect_by=Plane(origin=(7.768663503, 4.985758514, -2.106780436), z_dir=(0, -1, 0)), keep=Keep.TOP, mode=Mode.PRIVATE)
    filete2_piece_23 = filete2_piece_23a & filete2_piece_23b
    add(filete2_piece_23, mode=Mode.SUBTRACT)
    with BuildSketch(Plane(origin=(8.86, 4.21844243, -2.14), x_dir=(0.940229636725142, 0.34054108448718423, 0), z_dir=(0.34054108448718423, -0.940229636725142, 0))) as filete2_piece_24a_section:
        with BuildLine():
            CenterArc((1.28661416 - FILETE2_R, FILETE2_R), FILETE2_R, 270, 90)
            Line((1.28661416, FILETE2_R), (1.28661416, 0))
            Line((1.28661416, 0), (1.28661416 - FILETE2_R, 0))
        make_face()
    filete2_piece_24a = revolve(axis=Axis((8.86, 4.21844243, -2.14), (0, 0, 1)), revolution_arc=81.710254876, mode=Mode.PRIVATE)
    filete2_piece_24a = split(filete2_piece_24a, bisect_by=Plane(origin=(9.951335845, 4.985758514, -2.106780541), z_dir=(0, -1, 0)), keep=Keep.TOP, mode=Mode.PRIVATE)
    with BuildSketch(Plane(origin=(11.375, 4.985758514, -2.14), x_dir=(0, -1, 0), z_dir=(-1, 0, 0))) as filete2_piece_24b_section:
        with BuildLine():
            CenterArc((FILETE2_R, FILETE2_R), FILETE2_R, 180, 90)
            Line((0, FILETE2_R), (0, 0))
            Line((0, 0), (FILETE2_R, 0))
        make_face()
    filete2_piece_24b = extrude(amount=1.857235736, mode=Mode.PRIVATE)
    filete2_piece_24b = filete2_piece_24b & Plane(origin=(8.86, 4.21844243, -2.107095537), x_dir=(0.8026992826896523, 0.5963839883577674, 0), z_dir=(0, 0, 1)) * Cylinder(1.28661416, 5, mode=Mode.PRIVATE)
    filete2_piece_24 = filete2_piece_24a & filete2_piece_24b
    add(filete2_piece_24, mode=Mode.SUBTRACT)
    with BuildSketch(Plane(origin=(8.86, -4.24107257, -1.79), x_dir=(-0.9459877087145345, -0.324202490676776, 0), z_dir=(-0.324202490676776, 0.9459877087145345, 0))) as filete2_piece_25a_section:
        with BuildLine():
            CenterArc((1.273247493 - FILETE2_R, -FILETE2_R), FILETE2_R, 0, 90)
            Line((1.273247493, -FILETE2_R), (1.273247493, 0))
            Line((1.273247493, 0), (1.273247493 - FILETE2_R, 0))
        make_face()
    filete2_piece_25a = revolve(axis=Axis((8.86, -4.24107257, -1.79), (0, 0, 1)), revolution_arc=79.358119844, mode=Mode.PRIVATE)
    filete2_piece_25a = split(filete2_piece_25a, bisect_by=Plane(origin=(7.770930707, -4.985758514, -1.823259416), z_dir=(0, 1, 0)), keep=Keep.TOP, mode=Mode.PRIVATE)
    with BuildSketch(Plane(origin=(8.202235736, -4.985758514, -1.79), x_dir=(0, 1, 0), z_dir=(-1, 0, 0))) as filete2_piece_25b_section:
        with BuildLine():
            CenterArc((FILETE2_R, FILETE2_R), FILETE2_R, 180, 90)
            Line((0, FILETE2_R), (0, 0))
            Line((0, 0), (FILETE2_R, 0))
        make_face()
    filete2_piece_25b = extrude(amount=1.857235736, mode=Mode.PRIVATE)
    filete2_piece_25b = filete2_piece_25b & Plane(origin=(8.86, -4.24107257, -1.822934762), x_dir=(0.8111260921200049, -0.5848713214734753, 0), z_dir=(0, 0, 1)) * Cylinder(1.273247493, 5, mode=Mode.PRIVATE)
    filete2_piece_25 = filete2_piece_25a & filete2_piece_25b
    add(filete2_piece_25, mode=Mode.SUBTRACT)
    with BuildSketch(Plane(origin=(8.86, -4.24107257, -1.79), x_dir=(-0.14393107441873307, -0.9895877150695988, 0), z_dir=(-0.9895877150695988, 0.14393107441873307, 0))) as filete2_piece_26a_section:
        with BuildLine():
            CenterArc((1.273247493 - FILETE2_R, -FILETE2_R), FILETE2_R, 0, 90)
            Line((1.273247493 - FILETE2_R, 0), (1.273247493, 0))
            Line((1.273247493, 0), (1.273247493, -FILETE2_R))
        make_face()
    filete2_piece_26a = revolve(axis=Axis((8.86, -4.24107257, -1.79), (0, 0, 1)), revolution_arc=79.358119844, mode=Mode.PRIVATE)
    filete2_piece_26a = split(filete2_piece_26a, bisect_by=Plane(origin=(9.949069162, -4.985758514, -1.82325941), z_dir=(0, 1, 0)), keep=Keep.TOP, mode=Mode.PRIVATE)
    with BuildSketch(Plane(origin=(11.375, -4.985758514, -1.79), x_dir=(0, 1, 0), z_dir=(-1, 0, 0))) as filete2_piece_26b_section:
        with BuildLine():
            CenterArc((FILETE2_R, FILETE2_R), FILETE2_R, 180, 90)
            Line((0, FILETE2_R), (0, 0))
            Line((0, 0), (FILETE2_R, 0))
        make_face()
    filete2_piece_26b = extrude(amount=1.857235736, mode=Mode.PRIVATE)
    filete2_piece_26b = filete2_piece_26b & Plane(origin=(8.86, -4.24107257, -1.822934762), x_dir=(0.8111260921200049, -0.5848713214734753, 0), z_dir=(0, 0, 1)) * Cylinder(1.273247493, 5, mode=Mode.PRIVATE)
    filete2_piece_26 = filete2_piece_26a & filete2_piece_26b
    add(filete2_piece_26, mode=Mode.SUBTRACT)
    with BuildSketch(Plane(origin=(11.375, -4.985758514, -2.14), x_dir=(0, 1, 0), z_dir=(-1, 0, 0))) as filete2_piece_27a_section:
        with BuildLine():
            CenterArc((FILETE2_R, -FILETE2_R), FILETE2_R, 90, 90)
            Line((0, -FILETE2_R), (0, 0))
            Line((0, 0), (FILETE2_R, 0))
        make_face()
    filete2_piece_27a = extrude(amount=1.857235736, mode=Mode.PRIVATE)
    filete2_piece_27a = filete2_piece_27a & Plane(origin=(8.86, -4.24107257, -2.107065238), x_dir=(0.8111260921200049, -0.5848713214734753, 0), z_dir=(0, 0, 1)) * Cylinder(1.273247493, 5, mode=Mode.PRIVATE)
    with BuildSketch(Plane(origin=(8.86, -4.24107257, -2.14), x_dir=(-0.14393107441877348, -0.9895877150695928, 0), z_dir=(-0.9895877150695928, 0.14393107441877348, 0))) as filete2_piece_27b_section:
        with BuildLine():
            CenterArc((1.273247493 - FILETE2_R, FILETE2_R), FILETE2_R, 270, 90)
            Line((1.273247493, FILETE2_R), (1.273247493, 0))
            Line((1.273247493, 0), (1.273247493 - FILETE2_R, 0))
        make_face()
    filete2_piece_27b = revolve(axis=Axis((8.86, -4.24107257, -2.14), (0, 0, 1)), revolution_arc=79.358119844, mode=Mode.PRIVATE)
    filete2_piece_27b = split(filete2_piece_27b, bisect_by=Plane(origin=(9.949069162, -4.985758514, -2.10674059), z_dir=(0, 1, 0)), keep=Keep.TOP, mode=Mode.PRIVATE)
    filete2_piece_27 = filete2_piece_27a & filete2_piece_27b
    add(filete2_piece_27, mode=Mode.SUBTRACT)
    with BuildSketch(Plane(origin=(8.86, -4.24107257, -2.14), x_dir=(-0.9459877087145341, -0.3242024906767768, 0), z_dir=(-0.3242024906767768, 0.9459877087145341, 0))) as filete2_piece_28a_section:
        with BuildLine():
            CenterArc((1.273247493 - FILETE2_R, FILETE2_R), FILETE2_R, 270, 90)
            Line((1.273247493, FILETE2_R), (1.273247493, 0))
            Line((1.273247493, 0), (1.273247493 - FILETE2_R, 0))
        make_face()
    filete2_piece_28a = revolve(axis=Axis((8.86, -4.24107257, -2.14), (0, 0, 1)), revolution_arc=79.358119844, mode=Mode.PRIVATE)
    filete2_piece_28a = split(filete2_piece_28a, bisect_by=Plane(origin=(7.770930707, -4.985758514, -2.106740584), z_dir=(0, 1, 0)), keep=Keep.TOP, mode=Mode.PRIVATE)
    with BuildSketch(Plane(origin=(8.202235736, -4.985758514, -2.14), x_dir=(0, 1, 0), z_dir=(-1, 0, 0))) as filete2_piece_28b_section:
        with BuildLine():
            CenterArc((FILETE2_R, -FILETE2_R), FILETE2_R, 90, 90)
            Line((0, -FILETE2_R), (0, 0))
            Line((0, 0), (FILETE2_R, 0))
        make_face()
    filete2_piece_28b = extrude(amount=1.857235736, mode=Mode.PRIVATE)
    filete2_piece_28b = filete2_piece_28b & Plane(origin=(8.86, -4.24107257, -2.107065238), x_dir=(0.8111260921200049, -0.5848713214734753, 0), z_dir=(0, 0, 1)) * Cylinder(1.273247493, 5, mode=Mode.PRIVATE)
    filete2_piece_28 = filete2_piece_28a & filete2_piece_28b
    add(filete2_piece_28, mode=Mode.SUBTRACT)


solid = part.part
